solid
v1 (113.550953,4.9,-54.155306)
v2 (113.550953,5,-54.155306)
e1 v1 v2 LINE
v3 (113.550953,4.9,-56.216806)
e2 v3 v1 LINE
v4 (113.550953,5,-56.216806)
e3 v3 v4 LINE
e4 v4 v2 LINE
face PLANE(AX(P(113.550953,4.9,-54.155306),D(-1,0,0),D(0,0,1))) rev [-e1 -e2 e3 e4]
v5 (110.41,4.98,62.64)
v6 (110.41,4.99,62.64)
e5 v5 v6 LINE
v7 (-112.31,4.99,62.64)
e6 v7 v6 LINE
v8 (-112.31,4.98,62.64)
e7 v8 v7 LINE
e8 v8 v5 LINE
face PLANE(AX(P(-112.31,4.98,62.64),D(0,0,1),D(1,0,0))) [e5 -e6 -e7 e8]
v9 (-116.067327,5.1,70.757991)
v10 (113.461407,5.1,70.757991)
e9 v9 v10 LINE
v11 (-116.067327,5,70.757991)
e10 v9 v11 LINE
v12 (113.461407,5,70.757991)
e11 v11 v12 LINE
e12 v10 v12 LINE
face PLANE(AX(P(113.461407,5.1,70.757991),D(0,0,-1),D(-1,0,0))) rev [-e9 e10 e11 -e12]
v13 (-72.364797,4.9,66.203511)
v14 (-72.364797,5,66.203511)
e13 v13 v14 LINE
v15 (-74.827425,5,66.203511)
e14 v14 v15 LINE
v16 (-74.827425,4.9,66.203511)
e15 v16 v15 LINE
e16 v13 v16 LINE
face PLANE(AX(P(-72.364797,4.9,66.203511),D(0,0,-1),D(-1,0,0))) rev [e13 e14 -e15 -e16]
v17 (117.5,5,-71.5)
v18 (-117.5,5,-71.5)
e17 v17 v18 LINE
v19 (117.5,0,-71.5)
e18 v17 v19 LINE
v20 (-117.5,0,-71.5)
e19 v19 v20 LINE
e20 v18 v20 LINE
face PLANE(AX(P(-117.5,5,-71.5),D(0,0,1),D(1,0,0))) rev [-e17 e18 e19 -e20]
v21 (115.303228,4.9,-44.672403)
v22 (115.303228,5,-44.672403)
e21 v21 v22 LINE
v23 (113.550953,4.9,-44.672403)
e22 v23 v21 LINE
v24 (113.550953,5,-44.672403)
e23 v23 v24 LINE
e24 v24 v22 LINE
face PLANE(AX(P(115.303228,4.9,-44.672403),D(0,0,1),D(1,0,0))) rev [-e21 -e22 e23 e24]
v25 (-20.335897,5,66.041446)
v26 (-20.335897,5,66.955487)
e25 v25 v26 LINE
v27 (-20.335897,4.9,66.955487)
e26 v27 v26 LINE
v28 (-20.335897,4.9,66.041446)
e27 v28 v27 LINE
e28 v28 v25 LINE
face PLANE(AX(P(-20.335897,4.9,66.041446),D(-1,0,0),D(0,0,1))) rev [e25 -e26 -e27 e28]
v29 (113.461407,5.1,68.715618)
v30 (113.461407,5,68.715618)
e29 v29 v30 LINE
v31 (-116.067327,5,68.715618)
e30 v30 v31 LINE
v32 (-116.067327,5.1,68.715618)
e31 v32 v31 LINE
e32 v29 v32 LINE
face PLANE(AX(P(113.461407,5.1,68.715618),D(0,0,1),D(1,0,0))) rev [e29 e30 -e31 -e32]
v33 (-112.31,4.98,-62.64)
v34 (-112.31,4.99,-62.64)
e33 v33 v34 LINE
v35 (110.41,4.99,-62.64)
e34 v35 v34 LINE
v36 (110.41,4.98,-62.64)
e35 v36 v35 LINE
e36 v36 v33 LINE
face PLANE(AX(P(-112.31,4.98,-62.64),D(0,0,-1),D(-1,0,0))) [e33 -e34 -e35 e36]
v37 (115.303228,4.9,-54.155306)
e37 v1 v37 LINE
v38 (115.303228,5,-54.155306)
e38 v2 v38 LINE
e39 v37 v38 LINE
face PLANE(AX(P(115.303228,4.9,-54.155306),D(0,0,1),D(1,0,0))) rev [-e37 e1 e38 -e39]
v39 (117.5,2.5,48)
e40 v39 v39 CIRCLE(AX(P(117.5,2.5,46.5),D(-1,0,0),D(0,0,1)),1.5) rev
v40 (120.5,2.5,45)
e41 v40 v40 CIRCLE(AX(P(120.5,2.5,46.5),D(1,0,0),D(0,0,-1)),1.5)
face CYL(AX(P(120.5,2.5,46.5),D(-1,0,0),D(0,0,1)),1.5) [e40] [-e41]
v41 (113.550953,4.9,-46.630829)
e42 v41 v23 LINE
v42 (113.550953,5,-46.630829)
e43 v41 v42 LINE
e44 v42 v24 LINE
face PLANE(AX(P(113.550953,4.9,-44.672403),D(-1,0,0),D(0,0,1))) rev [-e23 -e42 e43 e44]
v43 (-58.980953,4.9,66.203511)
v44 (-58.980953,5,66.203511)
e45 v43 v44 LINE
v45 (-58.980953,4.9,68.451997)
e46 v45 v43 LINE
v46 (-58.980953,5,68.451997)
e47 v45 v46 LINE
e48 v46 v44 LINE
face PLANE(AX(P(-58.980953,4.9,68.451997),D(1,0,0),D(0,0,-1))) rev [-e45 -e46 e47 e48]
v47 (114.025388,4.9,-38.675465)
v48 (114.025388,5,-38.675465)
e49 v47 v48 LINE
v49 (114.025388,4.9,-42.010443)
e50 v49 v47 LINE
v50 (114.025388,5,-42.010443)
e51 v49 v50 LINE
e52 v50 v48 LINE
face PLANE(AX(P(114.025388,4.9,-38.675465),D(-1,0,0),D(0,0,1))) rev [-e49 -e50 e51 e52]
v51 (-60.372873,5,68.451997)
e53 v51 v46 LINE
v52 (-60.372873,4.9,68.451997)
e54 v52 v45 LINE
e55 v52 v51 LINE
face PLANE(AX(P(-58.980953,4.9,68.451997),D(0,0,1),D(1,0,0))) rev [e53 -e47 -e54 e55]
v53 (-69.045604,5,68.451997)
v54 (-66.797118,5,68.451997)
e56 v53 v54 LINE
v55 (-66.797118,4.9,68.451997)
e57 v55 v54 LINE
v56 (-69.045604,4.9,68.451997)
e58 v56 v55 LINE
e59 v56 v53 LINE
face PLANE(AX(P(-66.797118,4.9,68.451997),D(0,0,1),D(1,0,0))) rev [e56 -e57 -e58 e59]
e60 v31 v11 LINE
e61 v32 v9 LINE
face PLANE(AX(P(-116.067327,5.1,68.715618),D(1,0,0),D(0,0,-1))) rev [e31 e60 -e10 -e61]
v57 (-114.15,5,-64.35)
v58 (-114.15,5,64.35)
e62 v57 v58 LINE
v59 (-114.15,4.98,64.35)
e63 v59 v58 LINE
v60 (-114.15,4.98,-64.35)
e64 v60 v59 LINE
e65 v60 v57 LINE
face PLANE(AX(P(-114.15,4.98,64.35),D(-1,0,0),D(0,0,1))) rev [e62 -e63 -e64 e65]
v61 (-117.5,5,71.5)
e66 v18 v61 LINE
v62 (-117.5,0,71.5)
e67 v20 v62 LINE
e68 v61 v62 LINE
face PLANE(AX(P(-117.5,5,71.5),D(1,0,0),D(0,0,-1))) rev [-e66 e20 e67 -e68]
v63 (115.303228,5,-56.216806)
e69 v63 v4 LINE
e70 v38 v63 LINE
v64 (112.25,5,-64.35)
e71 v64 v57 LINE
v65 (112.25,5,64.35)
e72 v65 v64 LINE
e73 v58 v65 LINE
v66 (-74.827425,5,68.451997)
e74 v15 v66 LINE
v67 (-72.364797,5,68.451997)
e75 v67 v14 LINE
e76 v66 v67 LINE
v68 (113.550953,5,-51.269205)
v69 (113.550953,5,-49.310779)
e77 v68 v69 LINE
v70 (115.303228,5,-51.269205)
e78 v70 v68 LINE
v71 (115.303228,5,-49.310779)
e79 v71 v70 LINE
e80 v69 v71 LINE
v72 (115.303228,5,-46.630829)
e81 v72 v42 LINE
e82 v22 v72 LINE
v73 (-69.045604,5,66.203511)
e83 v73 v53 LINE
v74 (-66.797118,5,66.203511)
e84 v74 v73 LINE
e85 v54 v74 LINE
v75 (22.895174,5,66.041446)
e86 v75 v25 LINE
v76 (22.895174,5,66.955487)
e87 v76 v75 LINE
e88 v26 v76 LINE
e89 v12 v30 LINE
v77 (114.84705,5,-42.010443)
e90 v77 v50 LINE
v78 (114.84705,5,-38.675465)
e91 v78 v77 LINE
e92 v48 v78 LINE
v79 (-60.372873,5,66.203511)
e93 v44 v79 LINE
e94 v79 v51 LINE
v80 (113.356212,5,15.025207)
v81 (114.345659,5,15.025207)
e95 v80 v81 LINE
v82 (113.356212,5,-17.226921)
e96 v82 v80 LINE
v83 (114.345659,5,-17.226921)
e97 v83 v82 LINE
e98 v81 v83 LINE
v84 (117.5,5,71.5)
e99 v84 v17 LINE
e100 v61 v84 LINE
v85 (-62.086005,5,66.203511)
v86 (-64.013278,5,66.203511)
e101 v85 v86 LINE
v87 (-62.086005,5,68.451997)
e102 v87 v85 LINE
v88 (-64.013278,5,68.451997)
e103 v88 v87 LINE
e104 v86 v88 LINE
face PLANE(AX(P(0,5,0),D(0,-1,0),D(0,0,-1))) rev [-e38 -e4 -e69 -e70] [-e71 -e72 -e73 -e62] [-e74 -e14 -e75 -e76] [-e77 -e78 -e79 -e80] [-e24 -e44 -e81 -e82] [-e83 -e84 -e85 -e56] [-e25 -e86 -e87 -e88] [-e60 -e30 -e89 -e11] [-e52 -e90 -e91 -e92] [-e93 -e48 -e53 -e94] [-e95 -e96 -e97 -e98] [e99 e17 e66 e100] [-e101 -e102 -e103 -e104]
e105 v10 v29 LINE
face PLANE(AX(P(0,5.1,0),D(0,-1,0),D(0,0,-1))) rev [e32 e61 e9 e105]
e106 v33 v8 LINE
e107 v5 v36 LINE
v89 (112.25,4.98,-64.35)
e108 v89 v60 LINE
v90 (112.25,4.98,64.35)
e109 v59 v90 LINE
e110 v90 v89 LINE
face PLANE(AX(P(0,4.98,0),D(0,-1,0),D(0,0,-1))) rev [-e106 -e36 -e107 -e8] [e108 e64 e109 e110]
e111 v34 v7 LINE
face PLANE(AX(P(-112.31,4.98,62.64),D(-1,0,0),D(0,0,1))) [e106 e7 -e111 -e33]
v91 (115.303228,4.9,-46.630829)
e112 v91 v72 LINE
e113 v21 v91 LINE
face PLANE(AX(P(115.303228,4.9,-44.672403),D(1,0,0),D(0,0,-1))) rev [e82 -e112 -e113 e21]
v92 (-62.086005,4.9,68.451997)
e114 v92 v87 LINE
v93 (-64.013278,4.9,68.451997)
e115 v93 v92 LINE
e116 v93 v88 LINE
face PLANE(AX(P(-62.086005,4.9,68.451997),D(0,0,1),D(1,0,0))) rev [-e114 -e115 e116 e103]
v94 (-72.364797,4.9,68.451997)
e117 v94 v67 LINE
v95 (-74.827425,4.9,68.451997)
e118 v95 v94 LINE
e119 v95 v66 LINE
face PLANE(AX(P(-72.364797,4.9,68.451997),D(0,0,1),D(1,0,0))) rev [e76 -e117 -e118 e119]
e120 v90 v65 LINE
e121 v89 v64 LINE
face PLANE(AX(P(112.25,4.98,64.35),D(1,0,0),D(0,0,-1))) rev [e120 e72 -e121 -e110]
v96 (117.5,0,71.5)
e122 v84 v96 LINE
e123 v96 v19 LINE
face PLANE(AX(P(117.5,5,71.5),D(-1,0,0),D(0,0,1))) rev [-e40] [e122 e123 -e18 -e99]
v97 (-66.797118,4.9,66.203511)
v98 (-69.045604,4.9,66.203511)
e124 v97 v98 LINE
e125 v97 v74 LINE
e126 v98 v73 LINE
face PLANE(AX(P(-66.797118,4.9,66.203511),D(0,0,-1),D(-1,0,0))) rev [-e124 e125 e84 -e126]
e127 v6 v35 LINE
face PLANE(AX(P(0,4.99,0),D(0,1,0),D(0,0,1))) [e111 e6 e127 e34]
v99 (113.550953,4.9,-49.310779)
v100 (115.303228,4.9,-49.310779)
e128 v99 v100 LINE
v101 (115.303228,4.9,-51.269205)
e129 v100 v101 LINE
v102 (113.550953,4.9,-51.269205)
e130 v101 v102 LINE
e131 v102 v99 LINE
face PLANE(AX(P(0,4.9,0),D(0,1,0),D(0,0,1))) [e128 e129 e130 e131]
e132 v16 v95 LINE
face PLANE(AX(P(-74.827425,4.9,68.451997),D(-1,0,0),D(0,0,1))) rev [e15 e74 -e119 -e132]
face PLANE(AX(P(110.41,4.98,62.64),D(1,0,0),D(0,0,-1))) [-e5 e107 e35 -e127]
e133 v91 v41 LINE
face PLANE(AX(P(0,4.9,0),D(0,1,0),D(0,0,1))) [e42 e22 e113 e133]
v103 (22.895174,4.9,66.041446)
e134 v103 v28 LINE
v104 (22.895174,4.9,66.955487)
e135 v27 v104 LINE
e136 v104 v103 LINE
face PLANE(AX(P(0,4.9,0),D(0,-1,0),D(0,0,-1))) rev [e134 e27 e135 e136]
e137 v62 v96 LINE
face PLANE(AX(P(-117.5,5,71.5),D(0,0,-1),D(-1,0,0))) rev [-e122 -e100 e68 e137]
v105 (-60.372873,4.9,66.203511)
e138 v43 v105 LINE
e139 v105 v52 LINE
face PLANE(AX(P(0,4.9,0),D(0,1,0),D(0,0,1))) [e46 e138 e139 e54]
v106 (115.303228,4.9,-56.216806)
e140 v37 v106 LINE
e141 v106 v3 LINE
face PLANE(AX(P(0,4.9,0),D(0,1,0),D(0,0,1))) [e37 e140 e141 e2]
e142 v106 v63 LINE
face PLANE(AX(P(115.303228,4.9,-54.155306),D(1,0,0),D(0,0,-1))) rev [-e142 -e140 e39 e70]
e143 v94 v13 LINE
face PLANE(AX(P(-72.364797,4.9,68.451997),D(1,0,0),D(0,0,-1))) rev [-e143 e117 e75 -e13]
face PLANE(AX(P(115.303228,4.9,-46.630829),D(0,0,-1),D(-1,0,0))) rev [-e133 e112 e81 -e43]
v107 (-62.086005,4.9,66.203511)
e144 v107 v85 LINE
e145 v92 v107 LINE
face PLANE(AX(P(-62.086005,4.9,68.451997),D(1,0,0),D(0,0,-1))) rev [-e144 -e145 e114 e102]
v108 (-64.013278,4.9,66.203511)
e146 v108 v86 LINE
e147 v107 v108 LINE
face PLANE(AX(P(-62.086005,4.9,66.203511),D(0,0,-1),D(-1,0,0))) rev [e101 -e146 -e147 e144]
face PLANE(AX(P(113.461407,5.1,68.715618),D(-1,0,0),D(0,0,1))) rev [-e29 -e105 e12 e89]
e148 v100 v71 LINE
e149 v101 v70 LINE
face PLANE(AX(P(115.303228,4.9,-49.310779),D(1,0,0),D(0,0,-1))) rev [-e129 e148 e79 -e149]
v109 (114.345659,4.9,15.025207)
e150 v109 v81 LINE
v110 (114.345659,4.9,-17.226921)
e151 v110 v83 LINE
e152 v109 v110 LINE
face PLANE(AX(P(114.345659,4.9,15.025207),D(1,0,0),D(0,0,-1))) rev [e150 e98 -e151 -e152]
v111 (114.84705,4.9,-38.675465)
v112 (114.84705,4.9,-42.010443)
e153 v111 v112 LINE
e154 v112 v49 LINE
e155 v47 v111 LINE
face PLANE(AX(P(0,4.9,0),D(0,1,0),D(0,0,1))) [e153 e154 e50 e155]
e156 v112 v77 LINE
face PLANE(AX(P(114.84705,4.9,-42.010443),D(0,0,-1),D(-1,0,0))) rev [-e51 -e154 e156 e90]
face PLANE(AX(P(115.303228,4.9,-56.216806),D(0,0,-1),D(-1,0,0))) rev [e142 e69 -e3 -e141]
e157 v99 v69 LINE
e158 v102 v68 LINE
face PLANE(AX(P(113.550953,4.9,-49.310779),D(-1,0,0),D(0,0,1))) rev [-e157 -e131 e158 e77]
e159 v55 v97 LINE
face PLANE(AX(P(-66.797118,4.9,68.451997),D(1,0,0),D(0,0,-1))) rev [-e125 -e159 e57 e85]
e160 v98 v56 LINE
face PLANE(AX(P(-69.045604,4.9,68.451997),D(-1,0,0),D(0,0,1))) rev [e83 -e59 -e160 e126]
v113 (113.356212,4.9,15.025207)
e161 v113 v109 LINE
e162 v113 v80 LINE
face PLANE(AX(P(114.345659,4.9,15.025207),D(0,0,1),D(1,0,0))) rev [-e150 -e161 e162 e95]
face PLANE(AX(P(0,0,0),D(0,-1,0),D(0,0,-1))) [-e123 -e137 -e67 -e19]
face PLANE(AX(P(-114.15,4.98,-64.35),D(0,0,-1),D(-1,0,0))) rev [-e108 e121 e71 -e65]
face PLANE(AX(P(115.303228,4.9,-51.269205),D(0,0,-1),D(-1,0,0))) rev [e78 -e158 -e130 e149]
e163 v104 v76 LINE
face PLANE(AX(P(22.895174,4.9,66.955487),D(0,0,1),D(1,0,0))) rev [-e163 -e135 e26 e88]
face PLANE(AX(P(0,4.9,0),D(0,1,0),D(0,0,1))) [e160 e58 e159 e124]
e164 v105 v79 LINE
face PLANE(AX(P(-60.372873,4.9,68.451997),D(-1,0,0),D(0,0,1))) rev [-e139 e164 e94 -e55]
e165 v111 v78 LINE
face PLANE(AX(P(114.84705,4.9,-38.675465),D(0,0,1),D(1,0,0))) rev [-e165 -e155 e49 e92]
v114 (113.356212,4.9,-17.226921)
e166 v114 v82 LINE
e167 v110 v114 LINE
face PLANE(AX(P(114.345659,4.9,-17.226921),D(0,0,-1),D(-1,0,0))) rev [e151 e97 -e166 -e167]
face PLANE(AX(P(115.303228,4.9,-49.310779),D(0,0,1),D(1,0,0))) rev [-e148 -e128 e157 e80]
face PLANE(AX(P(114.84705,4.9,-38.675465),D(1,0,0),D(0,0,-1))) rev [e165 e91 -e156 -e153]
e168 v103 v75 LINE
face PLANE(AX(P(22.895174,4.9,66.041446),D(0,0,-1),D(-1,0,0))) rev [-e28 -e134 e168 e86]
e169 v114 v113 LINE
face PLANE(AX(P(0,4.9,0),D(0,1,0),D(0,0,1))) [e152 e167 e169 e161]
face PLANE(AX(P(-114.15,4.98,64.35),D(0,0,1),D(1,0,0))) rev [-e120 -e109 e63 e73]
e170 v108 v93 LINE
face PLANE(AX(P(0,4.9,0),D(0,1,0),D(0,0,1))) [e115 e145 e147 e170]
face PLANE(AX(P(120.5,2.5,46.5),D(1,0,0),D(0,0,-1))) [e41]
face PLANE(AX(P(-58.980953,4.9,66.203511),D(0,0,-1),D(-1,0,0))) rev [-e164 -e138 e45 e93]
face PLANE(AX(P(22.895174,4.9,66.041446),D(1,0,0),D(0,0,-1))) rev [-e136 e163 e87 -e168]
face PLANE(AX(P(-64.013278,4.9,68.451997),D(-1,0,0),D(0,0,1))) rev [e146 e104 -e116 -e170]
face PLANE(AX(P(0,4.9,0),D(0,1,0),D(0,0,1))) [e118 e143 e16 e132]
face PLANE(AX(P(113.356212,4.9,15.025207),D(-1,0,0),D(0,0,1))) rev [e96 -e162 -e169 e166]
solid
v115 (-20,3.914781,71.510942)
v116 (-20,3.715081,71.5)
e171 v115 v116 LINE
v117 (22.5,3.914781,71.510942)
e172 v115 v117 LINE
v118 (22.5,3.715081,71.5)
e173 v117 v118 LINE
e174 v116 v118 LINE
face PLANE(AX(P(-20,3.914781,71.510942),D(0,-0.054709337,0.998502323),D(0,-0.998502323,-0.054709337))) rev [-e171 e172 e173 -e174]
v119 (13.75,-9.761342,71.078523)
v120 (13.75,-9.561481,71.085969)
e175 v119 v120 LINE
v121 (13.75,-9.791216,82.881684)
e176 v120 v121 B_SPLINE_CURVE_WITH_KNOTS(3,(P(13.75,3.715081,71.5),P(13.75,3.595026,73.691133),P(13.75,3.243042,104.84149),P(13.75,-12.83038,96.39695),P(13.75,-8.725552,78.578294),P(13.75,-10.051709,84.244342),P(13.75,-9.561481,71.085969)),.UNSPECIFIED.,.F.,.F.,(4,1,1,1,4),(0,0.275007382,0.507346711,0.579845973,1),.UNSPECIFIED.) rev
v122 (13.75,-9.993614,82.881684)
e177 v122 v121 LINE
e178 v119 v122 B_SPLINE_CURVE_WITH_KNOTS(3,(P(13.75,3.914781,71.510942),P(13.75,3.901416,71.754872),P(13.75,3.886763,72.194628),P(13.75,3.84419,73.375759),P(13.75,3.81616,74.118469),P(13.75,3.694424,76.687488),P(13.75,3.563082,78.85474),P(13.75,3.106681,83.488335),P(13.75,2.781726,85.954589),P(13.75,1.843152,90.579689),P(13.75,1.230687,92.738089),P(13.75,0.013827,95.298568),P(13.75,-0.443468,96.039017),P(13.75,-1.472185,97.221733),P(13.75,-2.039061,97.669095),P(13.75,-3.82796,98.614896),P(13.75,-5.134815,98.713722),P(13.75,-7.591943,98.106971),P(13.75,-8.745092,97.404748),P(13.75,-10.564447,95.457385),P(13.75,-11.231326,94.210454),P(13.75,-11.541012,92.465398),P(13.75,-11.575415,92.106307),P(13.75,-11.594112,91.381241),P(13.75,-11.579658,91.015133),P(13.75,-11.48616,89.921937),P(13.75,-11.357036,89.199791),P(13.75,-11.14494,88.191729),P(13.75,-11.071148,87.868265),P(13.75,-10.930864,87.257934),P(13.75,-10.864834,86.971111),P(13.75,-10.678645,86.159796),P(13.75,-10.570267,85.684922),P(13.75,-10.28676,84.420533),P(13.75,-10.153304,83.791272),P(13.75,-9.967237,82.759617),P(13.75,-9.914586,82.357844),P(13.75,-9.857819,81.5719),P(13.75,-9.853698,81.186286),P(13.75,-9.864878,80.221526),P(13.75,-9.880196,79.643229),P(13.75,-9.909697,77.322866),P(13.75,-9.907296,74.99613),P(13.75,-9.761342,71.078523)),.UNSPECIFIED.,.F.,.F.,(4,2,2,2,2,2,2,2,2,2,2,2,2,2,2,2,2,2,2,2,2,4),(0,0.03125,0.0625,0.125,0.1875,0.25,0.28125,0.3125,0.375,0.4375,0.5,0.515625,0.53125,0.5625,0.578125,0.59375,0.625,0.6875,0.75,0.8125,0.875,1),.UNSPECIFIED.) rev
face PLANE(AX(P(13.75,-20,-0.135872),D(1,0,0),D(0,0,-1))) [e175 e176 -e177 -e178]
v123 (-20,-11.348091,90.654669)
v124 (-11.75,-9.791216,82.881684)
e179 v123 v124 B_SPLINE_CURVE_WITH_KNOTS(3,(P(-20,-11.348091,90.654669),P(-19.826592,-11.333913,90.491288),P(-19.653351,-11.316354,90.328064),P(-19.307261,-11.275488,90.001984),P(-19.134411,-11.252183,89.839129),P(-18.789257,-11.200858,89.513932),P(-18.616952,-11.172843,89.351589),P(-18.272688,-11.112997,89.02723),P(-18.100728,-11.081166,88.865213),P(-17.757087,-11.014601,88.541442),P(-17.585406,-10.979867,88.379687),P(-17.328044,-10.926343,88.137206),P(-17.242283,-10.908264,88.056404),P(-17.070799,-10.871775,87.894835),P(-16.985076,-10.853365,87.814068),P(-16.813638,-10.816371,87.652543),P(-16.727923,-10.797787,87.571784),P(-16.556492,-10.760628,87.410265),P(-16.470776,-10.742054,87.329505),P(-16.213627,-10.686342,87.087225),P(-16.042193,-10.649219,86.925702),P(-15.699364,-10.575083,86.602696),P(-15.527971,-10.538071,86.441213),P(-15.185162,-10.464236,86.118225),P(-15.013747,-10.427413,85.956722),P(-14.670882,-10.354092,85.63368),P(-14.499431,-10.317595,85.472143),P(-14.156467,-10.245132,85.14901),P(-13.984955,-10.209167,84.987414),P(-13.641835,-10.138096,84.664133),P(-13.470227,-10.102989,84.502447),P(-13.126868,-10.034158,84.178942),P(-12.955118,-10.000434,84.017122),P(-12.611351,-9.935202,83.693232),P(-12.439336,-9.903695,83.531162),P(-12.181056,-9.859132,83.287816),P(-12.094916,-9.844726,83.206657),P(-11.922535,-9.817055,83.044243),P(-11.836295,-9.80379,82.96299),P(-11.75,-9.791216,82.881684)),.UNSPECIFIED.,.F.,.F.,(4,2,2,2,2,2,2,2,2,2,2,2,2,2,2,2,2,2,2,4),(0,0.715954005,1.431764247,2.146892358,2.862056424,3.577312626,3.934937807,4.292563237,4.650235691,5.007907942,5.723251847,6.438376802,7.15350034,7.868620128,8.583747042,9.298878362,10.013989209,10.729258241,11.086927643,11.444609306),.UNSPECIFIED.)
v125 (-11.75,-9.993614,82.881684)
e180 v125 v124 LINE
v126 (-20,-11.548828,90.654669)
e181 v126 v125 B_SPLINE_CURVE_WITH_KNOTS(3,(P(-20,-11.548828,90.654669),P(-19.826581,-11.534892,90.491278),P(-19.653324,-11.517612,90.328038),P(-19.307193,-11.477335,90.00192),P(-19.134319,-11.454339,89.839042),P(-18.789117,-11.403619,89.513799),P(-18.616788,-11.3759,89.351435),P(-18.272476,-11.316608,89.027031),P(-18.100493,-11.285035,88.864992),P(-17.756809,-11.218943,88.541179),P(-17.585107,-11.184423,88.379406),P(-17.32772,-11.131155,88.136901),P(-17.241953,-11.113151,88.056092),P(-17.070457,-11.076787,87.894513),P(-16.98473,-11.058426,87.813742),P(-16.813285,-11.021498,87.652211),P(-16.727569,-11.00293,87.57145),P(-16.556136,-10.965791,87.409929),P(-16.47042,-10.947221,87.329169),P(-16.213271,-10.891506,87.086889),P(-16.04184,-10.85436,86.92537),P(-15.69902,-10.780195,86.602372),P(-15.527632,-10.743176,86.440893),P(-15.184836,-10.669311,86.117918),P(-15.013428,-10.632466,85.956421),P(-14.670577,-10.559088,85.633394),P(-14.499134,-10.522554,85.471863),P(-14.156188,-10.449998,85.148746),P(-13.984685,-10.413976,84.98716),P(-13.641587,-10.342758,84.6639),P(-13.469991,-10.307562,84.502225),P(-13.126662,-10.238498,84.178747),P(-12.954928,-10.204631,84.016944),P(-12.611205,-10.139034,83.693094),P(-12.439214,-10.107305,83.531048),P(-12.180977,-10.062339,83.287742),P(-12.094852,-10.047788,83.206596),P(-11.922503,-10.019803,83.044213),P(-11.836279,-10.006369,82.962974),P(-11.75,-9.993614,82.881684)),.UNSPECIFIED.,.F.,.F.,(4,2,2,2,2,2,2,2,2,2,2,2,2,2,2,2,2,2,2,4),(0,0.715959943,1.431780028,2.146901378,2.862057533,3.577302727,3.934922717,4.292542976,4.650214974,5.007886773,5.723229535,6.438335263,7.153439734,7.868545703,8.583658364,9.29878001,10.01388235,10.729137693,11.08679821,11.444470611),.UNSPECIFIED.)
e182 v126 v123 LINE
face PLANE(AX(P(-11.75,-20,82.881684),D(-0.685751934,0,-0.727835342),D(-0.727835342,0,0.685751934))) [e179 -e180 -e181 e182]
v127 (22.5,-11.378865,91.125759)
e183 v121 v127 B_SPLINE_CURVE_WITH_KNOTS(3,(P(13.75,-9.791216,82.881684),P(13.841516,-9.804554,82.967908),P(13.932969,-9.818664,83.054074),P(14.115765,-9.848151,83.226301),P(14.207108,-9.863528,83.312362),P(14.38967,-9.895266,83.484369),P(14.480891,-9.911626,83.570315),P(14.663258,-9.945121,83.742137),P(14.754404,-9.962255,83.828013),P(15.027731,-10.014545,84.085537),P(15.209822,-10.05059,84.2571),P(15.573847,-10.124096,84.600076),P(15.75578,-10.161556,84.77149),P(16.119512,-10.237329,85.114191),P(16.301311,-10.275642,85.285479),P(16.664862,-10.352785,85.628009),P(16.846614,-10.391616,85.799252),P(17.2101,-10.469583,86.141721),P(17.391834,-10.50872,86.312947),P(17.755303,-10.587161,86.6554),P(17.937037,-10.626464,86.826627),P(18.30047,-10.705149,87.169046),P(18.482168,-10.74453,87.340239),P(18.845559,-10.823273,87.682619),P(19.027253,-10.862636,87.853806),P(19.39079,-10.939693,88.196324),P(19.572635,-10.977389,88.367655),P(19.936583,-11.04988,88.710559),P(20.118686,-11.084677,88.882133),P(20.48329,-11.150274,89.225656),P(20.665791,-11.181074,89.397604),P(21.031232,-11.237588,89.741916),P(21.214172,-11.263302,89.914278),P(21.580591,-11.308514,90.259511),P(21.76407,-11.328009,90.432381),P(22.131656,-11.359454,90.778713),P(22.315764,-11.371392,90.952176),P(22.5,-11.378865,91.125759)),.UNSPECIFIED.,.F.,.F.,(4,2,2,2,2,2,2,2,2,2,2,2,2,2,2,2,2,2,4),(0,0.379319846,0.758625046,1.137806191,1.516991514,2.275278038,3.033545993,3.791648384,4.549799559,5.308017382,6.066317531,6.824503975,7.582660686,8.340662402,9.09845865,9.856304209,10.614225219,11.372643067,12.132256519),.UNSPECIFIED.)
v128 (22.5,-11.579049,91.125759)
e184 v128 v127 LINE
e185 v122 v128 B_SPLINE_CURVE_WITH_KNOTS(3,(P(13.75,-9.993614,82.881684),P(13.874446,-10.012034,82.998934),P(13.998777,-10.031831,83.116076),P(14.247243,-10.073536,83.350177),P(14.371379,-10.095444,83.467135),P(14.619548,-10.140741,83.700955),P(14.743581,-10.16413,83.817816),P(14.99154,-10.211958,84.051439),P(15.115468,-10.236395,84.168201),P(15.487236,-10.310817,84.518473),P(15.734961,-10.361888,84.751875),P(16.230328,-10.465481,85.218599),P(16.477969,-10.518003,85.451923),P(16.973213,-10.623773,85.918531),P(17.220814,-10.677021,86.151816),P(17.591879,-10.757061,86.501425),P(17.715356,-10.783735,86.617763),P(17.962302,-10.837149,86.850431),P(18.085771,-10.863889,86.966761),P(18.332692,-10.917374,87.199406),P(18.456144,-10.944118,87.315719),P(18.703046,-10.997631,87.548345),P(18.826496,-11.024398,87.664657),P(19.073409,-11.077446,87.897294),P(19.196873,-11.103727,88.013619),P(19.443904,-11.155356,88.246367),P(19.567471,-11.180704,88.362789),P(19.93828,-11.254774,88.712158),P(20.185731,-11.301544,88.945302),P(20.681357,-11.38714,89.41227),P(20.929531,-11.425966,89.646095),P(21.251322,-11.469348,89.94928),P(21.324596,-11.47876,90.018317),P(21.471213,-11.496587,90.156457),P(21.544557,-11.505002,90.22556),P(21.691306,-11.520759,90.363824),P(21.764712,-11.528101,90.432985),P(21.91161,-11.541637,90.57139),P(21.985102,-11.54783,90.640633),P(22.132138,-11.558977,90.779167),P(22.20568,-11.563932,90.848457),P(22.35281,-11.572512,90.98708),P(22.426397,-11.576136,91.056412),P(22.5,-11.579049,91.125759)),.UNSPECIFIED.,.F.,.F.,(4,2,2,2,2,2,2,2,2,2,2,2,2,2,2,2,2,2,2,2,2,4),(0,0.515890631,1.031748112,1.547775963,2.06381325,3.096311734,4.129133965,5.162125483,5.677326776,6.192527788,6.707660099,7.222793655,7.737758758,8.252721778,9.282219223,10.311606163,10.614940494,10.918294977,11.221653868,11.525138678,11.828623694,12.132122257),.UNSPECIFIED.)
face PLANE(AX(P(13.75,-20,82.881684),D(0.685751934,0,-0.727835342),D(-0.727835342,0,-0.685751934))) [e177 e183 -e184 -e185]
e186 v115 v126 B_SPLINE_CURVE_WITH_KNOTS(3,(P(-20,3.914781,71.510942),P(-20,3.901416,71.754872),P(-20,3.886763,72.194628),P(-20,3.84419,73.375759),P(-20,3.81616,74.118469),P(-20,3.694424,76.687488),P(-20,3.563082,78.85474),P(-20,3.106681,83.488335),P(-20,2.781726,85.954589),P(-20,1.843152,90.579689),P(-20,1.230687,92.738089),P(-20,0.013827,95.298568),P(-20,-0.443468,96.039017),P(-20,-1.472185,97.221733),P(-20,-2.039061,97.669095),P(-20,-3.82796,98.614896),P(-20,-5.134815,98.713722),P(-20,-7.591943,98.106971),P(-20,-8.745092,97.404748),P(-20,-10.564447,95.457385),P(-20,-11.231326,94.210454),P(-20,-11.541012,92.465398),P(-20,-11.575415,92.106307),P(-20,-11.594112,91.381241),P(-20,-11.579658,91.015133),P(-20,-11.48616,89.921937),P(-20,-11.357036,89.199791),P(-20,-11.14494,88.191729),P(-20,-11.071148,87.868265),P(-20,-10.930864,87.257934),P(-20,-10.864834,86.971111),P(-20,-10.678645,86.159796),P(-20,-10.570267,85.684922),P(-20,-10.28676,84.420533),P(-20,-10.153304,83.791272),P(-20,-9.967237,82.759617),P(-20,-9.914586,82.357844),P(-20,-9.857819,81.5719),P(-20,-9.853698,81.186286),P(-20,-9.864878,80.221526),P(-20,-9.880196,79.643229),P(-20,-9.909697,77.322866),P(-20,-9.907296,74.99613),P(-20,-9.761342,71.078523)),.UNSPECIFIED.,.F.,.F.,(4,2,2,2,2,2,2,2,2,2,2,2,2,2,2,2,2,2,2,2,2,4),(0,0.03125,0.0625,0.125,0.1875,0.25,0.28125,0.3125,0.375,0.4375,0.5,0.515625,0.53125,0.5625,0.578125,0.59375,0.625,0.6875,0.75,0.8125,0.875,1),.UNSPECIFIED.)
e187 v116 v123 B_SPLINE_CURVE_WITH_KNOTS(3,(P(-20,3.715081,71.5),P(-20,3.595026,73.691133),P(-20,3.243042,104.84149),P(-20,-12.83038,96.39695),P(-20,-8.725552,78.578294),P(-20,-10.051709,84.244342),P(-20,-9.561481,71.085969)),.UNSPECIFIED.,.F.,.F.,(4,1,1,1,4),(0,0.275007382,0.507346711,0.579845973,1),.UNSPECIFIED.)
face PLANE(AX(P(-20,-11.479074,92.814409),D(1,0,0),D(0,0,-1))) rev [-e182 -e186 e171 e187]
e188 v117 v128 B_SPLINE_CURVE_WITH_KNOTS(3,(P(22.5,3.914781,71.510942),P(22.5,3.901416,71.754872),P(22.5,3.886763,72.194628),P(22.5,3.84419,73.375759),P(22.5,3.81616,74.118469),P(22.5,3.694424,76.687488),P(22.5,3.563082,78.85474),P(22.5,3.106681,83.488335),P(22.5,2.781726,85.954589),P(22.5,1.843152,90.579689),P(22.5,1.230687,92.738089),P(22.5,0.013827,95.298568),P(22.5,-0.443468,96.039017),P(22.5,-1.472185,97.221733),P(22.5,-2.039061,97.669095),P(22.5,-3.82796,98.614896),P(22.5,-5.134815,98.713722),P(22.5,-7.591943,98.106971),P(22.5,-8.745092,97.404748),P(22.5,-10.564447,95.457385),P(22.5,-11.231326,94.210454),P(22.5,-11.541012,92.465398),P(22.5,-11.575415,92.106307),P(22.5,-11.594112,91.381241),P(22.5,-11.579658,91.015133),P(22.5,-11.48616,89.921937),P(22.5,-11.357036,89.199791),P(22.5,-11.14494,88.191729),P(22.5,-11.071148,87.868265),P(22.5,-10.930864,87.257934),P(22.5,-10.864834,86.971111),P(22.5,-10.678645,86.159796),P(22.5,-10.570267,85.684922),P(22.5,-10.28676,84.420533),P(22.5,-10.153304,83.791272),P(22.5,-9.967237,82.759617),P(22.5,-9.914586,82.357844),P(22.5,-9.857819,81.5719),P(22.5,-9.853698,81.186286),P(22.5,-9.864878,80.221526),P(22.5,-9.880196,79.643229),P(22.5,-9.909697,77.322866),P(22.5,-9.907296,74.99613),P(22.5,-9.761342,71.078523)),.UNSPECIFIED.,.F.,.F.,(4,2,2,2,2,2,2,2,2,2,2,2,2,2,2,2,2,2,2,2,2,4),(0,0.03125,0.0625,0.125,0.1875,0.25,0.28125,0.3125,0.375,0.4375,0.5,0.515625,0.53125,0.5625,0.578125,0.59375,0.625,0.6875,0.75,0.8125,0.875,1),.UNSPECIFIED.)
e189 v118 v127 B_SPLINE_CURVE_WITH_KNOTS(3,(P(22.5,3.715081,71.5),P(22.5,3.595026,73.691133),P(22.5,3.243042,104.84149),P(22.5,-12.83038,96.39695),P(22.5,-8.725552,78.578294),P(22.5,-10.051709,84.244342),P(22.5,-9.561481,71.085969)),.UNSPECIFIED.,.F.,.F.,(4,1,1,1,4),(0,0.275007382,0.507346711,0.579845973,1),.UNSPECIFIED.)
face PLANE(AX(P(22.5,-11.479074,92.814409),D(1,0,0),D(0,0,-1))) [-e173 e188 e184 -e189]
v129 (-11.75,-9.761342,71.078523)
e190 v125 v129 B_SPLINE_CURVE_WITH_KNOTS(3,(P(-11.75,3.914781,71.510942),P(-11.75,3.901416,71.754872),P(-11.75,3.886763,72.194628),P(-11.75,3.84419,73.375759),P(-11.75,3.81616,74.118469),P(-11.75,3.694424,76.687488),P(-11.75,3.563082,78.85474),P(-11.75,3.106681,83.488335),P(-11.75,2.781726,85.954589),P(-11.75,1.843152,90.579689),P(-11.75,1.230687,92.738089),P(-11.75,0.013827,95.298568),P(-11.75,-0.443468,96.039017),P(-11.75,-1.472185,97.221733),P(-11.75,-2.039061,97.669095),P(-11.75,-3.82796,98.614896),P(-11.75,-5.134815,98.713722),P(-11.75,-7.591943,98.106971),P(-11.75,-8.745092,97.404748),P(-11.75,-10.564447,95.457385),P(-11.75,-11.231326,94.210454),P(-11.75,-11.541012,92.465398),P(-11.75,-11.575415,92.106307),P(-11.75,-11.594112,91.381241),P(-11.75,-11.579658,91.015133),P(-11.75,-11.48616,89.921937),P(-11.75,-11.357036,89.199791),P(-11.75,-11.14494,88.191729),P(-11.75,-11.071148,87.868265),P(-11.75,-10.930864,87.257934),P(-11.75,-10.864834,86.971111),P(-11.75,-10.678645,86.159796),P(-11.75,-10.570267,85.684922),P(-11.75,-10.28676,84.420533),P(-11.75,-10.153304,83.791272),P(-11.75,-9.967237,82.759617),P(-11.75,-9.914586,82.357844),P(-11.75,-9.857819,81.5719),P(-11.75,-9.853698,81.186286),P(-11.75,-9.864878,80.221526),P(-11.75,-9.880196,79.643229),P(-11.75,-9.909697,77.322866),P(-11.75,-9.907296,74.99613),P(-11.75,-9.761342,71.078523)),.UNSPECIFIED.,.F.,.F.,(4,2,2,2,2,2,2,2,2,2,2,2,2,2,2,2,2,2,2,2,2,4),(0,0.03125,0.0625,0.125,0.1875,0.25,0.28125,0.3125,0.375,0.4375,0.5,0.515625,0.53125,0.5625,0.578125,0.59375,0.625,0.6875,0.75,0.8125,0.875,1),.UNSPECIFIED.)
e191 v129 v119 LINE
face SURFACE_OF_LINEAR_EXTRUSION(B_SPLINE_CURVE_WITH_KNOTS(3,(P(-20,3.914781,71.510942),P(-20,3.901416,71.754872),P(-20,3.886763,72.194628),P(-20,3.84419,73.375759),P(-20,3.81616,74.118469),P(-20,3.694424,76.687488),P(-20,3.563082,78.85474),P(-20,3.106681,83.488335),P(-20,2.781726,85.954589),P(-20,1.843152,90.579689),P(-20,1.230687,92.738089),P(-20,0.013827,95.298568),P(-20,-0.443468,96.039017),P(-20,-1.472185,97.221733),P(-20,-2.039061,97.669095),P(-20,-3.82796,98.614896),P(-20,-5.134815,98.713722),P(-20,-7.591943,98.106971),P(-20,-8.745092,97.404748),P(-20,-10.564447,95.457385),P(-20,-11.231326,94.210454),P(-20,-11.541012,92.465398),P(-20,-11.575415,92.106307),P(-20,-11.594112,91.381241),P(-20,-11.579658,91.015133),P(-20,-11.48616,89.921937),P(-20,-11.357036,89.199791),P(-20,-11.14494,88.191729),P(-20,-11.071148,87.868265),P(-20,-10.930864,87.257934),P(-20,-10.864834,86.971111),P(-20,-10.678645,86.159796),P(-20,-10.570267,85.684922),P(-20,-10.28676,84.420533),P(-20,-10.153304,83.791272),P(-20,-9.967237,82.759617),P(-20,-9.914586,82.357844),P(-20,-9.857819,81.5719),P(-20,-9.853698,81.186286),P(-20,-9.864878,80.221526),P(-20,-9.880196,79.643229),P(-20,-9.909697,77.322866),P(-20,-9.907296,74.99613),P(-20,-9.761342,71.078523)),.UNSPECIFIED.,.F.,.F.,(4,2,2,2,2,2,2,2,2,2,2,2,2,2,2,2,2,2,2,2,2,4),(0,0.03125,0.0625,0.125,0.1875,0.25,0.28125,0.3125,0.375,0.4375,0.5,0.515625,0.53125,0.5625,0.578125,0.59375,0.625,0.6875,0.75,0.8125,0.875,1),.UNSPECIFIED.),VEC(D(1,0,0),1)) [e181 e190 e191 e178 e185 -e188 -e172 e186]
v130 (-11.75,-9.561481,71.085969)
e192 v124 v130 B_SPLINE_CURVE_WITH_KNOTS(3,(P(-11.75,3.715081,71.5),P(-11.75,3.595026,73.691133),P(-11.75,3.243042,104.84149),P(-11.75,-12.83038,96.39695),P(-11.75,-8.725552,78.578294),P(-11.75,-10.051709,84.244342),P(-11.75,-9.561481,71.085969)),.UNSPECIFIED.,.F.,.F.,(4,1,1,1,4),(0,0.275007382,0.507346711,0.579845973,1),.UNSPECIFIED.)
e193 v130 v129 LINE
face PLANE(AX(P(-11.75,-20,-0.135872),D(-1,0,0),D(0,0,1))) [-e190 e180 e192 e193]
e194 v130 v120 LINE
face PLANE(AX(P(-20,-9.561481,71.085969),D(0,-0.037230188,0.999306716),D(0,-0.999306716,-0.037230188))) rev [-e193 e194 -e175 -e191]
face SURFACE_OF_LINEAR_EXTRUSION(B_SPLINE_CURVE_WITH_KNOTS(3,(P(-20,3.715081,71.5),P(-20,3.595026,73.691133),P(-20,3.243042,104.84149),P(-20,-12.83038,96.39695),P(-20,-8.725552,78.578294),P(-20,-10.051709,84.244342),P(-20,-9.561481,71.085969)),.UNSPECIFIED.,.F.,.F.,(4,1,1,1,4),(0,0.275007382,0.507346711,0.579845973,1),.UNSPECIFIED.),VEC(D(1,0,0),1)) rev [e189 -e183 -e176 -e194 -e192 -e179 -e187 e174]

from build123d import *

# Parameters (mm, degrees)
SKETCH_1_W             = 235
SKETCH_1_H             = 143
EXTRUDE_1_DEPTH        = 5
SKETCH_2_W             = 226.4
SKETCH_2_H             = 128.7
SKETCH_2_W_2           = 222.72
SKETCH_2_H_2           = 125.28
CUT_EXTRUDE_946_DEPTH  = 0.02
SKETCH_3_W             = 222.72
SKETCH_3_H             = 125.28
CUT_EXTRUDE_2_DEPTH    = 0.01
SKETCH_9_W             = 43.231071258
SKETCH_9_H             = 0.914041318
SKETCH_9_W_2           = 0.989446634
SKETCH_9_H_2           = 32.252128775
IC_DEPTH               = 0.1
SKETCH_10_W            = 229.528734104
SKETCH_10_H            = 2.042373104
EXTRUDE_1609_DEPTH     = 0.1
SKETCH_12_W            = 1.752275411
SKETCH_12_H            = 1.95842546
SKETCH_12_H_2          = 2.061500484
SKETCH_12_W_2          = 0.821661147
SKETCH_12_H_3          = 3.334977598
SKETCH_12_W_3          = 1.391919846
SKETCH_12_H_4          = 2.248485905
SKETCH_12_W_4          = 1.927273633
SKETCH_12_W_5          = 2.248485905
SKETCH_12_W_6          = 2.46262742
CUT_EXTRUDE_1968_DEPTH = 0.1
SKETCH_6_R             = 1.5
EXTRUDE_2975_DEPTH     = 3
EXTRUDE_START          = -20
EXTRUDE_3073_DEPTH     = 42.5
CUT_EXTRUDE_10_DEPTH   = 20


# Read off the part's stored shape, not the designer's step: 显示器出线
with BuildPart() as part:
    # 草图1 → 凸台-拉伸1 (new body)
    with BuildSketch(Plane(origin=(0, 0, 0), x_dir=(1, 0, 0), z_dir=(0, 1, 0))):
        Rectangle(SKETCH_1_W, SKETCH_1_H)
    extrude(amount=EXTRUDE_1_DEPTH)

    # 草图2 → Cut-Extrude 946 (cut)
    with BuildSketch(Plane(origin=(0, 5, 0), x_dir=(1, 0, 0), z_dir=(0, 1, 0))):
        with Locations((-0.95, 0)):
            Rectangle(SKETCH_2_W, SKETCH_2_H)
        with Locations((-0.95, 0)):
            Rectangle(SKETCH_2_W_2, SKETCH_2_H_2, mode=Mode.SUBTRACT)
    extrude(amount=-CUT_EXTRUDE_946_DEPTH, mode=Mode.SUBTRACT)

    # 草图3 → 切除-拉伸2 (cut)
    with BuildSketch(Plane(origin=(0, 5, 0), x_dir=(1, 0, 0), z_dir=(0, 1, 0))):
        with Locations((-0.95, 0)):
            Rectangle(SKETCH_3_W, SKETCH_3_H)
    extrude(amount=-CUT_EXTRUDE_2_DEPTH, mode=Mode.SUBTRACT)

    # 草图9 → 驱动IC (cut)
    with BuildSketch(Plane(origin=(0, 5, 0), x_dir=(1, 0, 0), z_dir=(0, 1, 0))):
        with Locations((1.279638732, -66.49846616)):
            Rectangle(SKETCH_9_W, SKETCH_9_H)
        with Locations((113.850935725, 1.100856888)):
            Rectangle(SKETCH_9_W_2, SKETCH_9_H_2)
    extrude(amount=-IC_DEPTH, mode=Mode.SUBTRACT)

    # 草图10 → Extrude 1609 (add)
    with BuildSketch(Plane(origin=(0, 5, 0), x_dir=(1, 0, 0), z_dir=(0, 1, 0))):
        with Locations((-1.302960394, -69.73680436)):
            Rectangle(SKETCH_10_W, SKETCH_10_H)
    extrude(amount=EXTRUDE_1609_DEPTH)

    # 草图12 → Cut-Extrude 1968 (cut)
    with BuildSketch(Plane(origin=(0, 5, 0), x_dir=(1, 0, 0), z_dir=(0, 1, 0))):
        with Locations((114.427090568, 45.651616033)):
            Rectangle(SKETCH_12_W, SKETCH_12_H)
        with Locations((114.427090568, 50.289992121)):
            Rectangle(SKETCH_12_W, SKETCH_12_H)
        with Locations((114.427090568, 55.18605577)):
            Rectangle(SKETCH_12_W, SKETCH_12_H_2)
        with Locations((114.436218982, 40.342954237)):
            Rectangle(SKETCH_12_W_2, SKETCH_12_H_3)
        with Locations((-59.67691262, -67.327753911)):
            Rectangle(SKETCH_12_W_3, SKETCH_12_H_4)
        with Locations((-63.049641478, -67.327753911)):
            Rectangle(SKETCH_12_W_4, SKETCH_12_H_4)
        with Locations((-67.921360937, -67.327753911)):
            Rectangle(SKETCH_12_W_5, SKETCH_12_H_4)
        with Locations((-73.596111078, -67.327753911)):
            Rectangle(SKETCH_12_W_6, SKETCH_12_H_4)
    extrude(amount=-CUT_EXTRUDE_1968_DEPTH, mode=Mode.SUBTRACT)

    # 草图6 → Extrude 2975 (add)
    with BuildSketch(Plane(origin=(117.5, 0, 0), x_dir=(0, 0, -1), z_dir=(1, 0, 0))):
        with Locations(Location((-46.5, 2.5, 0), (0, 0, 180))):
            Circle(SKETCH_6_R)
    extrude(amount=EXTRUDE_2975_DEPTH)


with BuildPart() as body_2:
    # Extrude 3073 outline → Extrude 3073 (new body)
    with BuildSketch(Plane(origin=(0, 0, 0), x_dir=(0, 0, -1), z_dir=(1, 0, 0)).offset(EXTRUDE_START)):
        with BuildLine():
            Line((-71.5, 3.715080853), (-71.510941867, 3.914781317))
            add(Edge.make_bspline(
                [(-71.510941867, 3.914781317), (-71.754872478, 3.901416018), (-72.194627935, 3.886763321), (-73.375759203, 3.844189538), (-74.118468696, 3.816160416), (-76.687488083, 3.694423661), (-78.854740178, 3.563082228), (-83.488334604, 3.106680779), (-85.954589269, 2.781725794), (-90.579689225, 1.843151605), (-92.738088621, 1.230687146), (-95.298568099, 0.013827058), (-96.03901686, -0.44346832), (-97.221733342, -1.472185096), (-97.669095243, -2.039061022), (-98.614896037, -3.827959887), (-98.713721913, -5.134815257), (-98.106970737, -7.591942772), (-97.404747884, -8.745092281), (-95.457384583, -10.564446673), (-94.210454059, -11.23132569), (-92.465397642, -11.541011542), (-92.106307033, -11.575415238), (-91.381240644, -11.594111693), (-91.015133288, -11.579658489), (-89.921936504, -11.48615957), (-89.199790652, -11.357035963), (-88.19172911, -11.144940279), (-87.868265248, -11.071147612), (-87.257934145, -10.930863762), (-86.971110762, -10.864833729), (-86.159796466, -10.678644701), (-85.684921812, -10.570266672), (-84.42053346, -10.286760291), (-83.791272064, -10.153303985), (-82.759616666, -9.967236766), (-82.357844012, -9.914586008), (-81.571899715, -9.857819276), (-81.186286297, -9.853698372), (-80.22152636, -9.864877736), (-79.643229224, -9.880196341), (-77.322866146, -9.909696774), (-74.996130434, -9.907296329), (-71.07852286, -9.761341876)],
                knots=[0, 0, 0, 0, 0.03125, 0.03125, 0.0625, 0.0625, 0.125, 0.125, 0.1875, 0.1875, 0.25, 0.25, 0.28125, 0.28125, 0.3125, 0.3125, 0.375, 0.375, 0.4375, 0.4375, 0.5, 0.5, 0.515625, 0.515625, 0.53125, 0.53125, 0.5625, 0.5625, 0.578125, 0.578125, 0.59375, 0.59375, 0.625, 0.625, 0.6875, 0.6875, 0.75, 0.75, 0.8125, 0.8125, 0.875, 0.875, 1, 1, 1, 1], degree=3))
            Line((-71.07852286, -9.761341876), (-71.085968898, -9.561480532))
            add(Edge.make_bspline(
                [(-71.5, 3.715080853), (-73.69113346, 3.595025589), (-104.84149021, 3.243041633), (-96.396950011, -12.830379964), (-78.578293713, -8.725552261), (-84.244341591, -10.051709086), (-71.085968898, -9.561480532)],
                knots=[0, 0, 0, 0, 0.275007382, 0.507346711, 0.579845973, 1, 1, 1, 1], degree=3))
        make_face()
    extrude(amount=EXTRUDE_3073_DEPTH)

    # 草图8 → 切除-拉伸10 (cut)
    with BuildSketch(Plane.XZ):
        Polygon((-11.75, -0.135871582), (-41.070949031, -0.135871582), (-41.070949031, 95.755276899), (-22.423816173, 95.755276899), (-22.423816173, 92.938340681), (-11.75, 82.88168411), align=None)
        Polygon((43.070949031, 95.755276899), (24.423816173, 95.755276899), (24.423816173, 92.938340681), (13.75, 82.88168411), (13.75, -0.135871582), (43.070949031, -0.135871582), align=None)
    extrude(amount=CUT_EXTRUDE_10_DEPTH, mode=Mode.SUBTRACT)


solid = Compound([part.part, body_2.part])
